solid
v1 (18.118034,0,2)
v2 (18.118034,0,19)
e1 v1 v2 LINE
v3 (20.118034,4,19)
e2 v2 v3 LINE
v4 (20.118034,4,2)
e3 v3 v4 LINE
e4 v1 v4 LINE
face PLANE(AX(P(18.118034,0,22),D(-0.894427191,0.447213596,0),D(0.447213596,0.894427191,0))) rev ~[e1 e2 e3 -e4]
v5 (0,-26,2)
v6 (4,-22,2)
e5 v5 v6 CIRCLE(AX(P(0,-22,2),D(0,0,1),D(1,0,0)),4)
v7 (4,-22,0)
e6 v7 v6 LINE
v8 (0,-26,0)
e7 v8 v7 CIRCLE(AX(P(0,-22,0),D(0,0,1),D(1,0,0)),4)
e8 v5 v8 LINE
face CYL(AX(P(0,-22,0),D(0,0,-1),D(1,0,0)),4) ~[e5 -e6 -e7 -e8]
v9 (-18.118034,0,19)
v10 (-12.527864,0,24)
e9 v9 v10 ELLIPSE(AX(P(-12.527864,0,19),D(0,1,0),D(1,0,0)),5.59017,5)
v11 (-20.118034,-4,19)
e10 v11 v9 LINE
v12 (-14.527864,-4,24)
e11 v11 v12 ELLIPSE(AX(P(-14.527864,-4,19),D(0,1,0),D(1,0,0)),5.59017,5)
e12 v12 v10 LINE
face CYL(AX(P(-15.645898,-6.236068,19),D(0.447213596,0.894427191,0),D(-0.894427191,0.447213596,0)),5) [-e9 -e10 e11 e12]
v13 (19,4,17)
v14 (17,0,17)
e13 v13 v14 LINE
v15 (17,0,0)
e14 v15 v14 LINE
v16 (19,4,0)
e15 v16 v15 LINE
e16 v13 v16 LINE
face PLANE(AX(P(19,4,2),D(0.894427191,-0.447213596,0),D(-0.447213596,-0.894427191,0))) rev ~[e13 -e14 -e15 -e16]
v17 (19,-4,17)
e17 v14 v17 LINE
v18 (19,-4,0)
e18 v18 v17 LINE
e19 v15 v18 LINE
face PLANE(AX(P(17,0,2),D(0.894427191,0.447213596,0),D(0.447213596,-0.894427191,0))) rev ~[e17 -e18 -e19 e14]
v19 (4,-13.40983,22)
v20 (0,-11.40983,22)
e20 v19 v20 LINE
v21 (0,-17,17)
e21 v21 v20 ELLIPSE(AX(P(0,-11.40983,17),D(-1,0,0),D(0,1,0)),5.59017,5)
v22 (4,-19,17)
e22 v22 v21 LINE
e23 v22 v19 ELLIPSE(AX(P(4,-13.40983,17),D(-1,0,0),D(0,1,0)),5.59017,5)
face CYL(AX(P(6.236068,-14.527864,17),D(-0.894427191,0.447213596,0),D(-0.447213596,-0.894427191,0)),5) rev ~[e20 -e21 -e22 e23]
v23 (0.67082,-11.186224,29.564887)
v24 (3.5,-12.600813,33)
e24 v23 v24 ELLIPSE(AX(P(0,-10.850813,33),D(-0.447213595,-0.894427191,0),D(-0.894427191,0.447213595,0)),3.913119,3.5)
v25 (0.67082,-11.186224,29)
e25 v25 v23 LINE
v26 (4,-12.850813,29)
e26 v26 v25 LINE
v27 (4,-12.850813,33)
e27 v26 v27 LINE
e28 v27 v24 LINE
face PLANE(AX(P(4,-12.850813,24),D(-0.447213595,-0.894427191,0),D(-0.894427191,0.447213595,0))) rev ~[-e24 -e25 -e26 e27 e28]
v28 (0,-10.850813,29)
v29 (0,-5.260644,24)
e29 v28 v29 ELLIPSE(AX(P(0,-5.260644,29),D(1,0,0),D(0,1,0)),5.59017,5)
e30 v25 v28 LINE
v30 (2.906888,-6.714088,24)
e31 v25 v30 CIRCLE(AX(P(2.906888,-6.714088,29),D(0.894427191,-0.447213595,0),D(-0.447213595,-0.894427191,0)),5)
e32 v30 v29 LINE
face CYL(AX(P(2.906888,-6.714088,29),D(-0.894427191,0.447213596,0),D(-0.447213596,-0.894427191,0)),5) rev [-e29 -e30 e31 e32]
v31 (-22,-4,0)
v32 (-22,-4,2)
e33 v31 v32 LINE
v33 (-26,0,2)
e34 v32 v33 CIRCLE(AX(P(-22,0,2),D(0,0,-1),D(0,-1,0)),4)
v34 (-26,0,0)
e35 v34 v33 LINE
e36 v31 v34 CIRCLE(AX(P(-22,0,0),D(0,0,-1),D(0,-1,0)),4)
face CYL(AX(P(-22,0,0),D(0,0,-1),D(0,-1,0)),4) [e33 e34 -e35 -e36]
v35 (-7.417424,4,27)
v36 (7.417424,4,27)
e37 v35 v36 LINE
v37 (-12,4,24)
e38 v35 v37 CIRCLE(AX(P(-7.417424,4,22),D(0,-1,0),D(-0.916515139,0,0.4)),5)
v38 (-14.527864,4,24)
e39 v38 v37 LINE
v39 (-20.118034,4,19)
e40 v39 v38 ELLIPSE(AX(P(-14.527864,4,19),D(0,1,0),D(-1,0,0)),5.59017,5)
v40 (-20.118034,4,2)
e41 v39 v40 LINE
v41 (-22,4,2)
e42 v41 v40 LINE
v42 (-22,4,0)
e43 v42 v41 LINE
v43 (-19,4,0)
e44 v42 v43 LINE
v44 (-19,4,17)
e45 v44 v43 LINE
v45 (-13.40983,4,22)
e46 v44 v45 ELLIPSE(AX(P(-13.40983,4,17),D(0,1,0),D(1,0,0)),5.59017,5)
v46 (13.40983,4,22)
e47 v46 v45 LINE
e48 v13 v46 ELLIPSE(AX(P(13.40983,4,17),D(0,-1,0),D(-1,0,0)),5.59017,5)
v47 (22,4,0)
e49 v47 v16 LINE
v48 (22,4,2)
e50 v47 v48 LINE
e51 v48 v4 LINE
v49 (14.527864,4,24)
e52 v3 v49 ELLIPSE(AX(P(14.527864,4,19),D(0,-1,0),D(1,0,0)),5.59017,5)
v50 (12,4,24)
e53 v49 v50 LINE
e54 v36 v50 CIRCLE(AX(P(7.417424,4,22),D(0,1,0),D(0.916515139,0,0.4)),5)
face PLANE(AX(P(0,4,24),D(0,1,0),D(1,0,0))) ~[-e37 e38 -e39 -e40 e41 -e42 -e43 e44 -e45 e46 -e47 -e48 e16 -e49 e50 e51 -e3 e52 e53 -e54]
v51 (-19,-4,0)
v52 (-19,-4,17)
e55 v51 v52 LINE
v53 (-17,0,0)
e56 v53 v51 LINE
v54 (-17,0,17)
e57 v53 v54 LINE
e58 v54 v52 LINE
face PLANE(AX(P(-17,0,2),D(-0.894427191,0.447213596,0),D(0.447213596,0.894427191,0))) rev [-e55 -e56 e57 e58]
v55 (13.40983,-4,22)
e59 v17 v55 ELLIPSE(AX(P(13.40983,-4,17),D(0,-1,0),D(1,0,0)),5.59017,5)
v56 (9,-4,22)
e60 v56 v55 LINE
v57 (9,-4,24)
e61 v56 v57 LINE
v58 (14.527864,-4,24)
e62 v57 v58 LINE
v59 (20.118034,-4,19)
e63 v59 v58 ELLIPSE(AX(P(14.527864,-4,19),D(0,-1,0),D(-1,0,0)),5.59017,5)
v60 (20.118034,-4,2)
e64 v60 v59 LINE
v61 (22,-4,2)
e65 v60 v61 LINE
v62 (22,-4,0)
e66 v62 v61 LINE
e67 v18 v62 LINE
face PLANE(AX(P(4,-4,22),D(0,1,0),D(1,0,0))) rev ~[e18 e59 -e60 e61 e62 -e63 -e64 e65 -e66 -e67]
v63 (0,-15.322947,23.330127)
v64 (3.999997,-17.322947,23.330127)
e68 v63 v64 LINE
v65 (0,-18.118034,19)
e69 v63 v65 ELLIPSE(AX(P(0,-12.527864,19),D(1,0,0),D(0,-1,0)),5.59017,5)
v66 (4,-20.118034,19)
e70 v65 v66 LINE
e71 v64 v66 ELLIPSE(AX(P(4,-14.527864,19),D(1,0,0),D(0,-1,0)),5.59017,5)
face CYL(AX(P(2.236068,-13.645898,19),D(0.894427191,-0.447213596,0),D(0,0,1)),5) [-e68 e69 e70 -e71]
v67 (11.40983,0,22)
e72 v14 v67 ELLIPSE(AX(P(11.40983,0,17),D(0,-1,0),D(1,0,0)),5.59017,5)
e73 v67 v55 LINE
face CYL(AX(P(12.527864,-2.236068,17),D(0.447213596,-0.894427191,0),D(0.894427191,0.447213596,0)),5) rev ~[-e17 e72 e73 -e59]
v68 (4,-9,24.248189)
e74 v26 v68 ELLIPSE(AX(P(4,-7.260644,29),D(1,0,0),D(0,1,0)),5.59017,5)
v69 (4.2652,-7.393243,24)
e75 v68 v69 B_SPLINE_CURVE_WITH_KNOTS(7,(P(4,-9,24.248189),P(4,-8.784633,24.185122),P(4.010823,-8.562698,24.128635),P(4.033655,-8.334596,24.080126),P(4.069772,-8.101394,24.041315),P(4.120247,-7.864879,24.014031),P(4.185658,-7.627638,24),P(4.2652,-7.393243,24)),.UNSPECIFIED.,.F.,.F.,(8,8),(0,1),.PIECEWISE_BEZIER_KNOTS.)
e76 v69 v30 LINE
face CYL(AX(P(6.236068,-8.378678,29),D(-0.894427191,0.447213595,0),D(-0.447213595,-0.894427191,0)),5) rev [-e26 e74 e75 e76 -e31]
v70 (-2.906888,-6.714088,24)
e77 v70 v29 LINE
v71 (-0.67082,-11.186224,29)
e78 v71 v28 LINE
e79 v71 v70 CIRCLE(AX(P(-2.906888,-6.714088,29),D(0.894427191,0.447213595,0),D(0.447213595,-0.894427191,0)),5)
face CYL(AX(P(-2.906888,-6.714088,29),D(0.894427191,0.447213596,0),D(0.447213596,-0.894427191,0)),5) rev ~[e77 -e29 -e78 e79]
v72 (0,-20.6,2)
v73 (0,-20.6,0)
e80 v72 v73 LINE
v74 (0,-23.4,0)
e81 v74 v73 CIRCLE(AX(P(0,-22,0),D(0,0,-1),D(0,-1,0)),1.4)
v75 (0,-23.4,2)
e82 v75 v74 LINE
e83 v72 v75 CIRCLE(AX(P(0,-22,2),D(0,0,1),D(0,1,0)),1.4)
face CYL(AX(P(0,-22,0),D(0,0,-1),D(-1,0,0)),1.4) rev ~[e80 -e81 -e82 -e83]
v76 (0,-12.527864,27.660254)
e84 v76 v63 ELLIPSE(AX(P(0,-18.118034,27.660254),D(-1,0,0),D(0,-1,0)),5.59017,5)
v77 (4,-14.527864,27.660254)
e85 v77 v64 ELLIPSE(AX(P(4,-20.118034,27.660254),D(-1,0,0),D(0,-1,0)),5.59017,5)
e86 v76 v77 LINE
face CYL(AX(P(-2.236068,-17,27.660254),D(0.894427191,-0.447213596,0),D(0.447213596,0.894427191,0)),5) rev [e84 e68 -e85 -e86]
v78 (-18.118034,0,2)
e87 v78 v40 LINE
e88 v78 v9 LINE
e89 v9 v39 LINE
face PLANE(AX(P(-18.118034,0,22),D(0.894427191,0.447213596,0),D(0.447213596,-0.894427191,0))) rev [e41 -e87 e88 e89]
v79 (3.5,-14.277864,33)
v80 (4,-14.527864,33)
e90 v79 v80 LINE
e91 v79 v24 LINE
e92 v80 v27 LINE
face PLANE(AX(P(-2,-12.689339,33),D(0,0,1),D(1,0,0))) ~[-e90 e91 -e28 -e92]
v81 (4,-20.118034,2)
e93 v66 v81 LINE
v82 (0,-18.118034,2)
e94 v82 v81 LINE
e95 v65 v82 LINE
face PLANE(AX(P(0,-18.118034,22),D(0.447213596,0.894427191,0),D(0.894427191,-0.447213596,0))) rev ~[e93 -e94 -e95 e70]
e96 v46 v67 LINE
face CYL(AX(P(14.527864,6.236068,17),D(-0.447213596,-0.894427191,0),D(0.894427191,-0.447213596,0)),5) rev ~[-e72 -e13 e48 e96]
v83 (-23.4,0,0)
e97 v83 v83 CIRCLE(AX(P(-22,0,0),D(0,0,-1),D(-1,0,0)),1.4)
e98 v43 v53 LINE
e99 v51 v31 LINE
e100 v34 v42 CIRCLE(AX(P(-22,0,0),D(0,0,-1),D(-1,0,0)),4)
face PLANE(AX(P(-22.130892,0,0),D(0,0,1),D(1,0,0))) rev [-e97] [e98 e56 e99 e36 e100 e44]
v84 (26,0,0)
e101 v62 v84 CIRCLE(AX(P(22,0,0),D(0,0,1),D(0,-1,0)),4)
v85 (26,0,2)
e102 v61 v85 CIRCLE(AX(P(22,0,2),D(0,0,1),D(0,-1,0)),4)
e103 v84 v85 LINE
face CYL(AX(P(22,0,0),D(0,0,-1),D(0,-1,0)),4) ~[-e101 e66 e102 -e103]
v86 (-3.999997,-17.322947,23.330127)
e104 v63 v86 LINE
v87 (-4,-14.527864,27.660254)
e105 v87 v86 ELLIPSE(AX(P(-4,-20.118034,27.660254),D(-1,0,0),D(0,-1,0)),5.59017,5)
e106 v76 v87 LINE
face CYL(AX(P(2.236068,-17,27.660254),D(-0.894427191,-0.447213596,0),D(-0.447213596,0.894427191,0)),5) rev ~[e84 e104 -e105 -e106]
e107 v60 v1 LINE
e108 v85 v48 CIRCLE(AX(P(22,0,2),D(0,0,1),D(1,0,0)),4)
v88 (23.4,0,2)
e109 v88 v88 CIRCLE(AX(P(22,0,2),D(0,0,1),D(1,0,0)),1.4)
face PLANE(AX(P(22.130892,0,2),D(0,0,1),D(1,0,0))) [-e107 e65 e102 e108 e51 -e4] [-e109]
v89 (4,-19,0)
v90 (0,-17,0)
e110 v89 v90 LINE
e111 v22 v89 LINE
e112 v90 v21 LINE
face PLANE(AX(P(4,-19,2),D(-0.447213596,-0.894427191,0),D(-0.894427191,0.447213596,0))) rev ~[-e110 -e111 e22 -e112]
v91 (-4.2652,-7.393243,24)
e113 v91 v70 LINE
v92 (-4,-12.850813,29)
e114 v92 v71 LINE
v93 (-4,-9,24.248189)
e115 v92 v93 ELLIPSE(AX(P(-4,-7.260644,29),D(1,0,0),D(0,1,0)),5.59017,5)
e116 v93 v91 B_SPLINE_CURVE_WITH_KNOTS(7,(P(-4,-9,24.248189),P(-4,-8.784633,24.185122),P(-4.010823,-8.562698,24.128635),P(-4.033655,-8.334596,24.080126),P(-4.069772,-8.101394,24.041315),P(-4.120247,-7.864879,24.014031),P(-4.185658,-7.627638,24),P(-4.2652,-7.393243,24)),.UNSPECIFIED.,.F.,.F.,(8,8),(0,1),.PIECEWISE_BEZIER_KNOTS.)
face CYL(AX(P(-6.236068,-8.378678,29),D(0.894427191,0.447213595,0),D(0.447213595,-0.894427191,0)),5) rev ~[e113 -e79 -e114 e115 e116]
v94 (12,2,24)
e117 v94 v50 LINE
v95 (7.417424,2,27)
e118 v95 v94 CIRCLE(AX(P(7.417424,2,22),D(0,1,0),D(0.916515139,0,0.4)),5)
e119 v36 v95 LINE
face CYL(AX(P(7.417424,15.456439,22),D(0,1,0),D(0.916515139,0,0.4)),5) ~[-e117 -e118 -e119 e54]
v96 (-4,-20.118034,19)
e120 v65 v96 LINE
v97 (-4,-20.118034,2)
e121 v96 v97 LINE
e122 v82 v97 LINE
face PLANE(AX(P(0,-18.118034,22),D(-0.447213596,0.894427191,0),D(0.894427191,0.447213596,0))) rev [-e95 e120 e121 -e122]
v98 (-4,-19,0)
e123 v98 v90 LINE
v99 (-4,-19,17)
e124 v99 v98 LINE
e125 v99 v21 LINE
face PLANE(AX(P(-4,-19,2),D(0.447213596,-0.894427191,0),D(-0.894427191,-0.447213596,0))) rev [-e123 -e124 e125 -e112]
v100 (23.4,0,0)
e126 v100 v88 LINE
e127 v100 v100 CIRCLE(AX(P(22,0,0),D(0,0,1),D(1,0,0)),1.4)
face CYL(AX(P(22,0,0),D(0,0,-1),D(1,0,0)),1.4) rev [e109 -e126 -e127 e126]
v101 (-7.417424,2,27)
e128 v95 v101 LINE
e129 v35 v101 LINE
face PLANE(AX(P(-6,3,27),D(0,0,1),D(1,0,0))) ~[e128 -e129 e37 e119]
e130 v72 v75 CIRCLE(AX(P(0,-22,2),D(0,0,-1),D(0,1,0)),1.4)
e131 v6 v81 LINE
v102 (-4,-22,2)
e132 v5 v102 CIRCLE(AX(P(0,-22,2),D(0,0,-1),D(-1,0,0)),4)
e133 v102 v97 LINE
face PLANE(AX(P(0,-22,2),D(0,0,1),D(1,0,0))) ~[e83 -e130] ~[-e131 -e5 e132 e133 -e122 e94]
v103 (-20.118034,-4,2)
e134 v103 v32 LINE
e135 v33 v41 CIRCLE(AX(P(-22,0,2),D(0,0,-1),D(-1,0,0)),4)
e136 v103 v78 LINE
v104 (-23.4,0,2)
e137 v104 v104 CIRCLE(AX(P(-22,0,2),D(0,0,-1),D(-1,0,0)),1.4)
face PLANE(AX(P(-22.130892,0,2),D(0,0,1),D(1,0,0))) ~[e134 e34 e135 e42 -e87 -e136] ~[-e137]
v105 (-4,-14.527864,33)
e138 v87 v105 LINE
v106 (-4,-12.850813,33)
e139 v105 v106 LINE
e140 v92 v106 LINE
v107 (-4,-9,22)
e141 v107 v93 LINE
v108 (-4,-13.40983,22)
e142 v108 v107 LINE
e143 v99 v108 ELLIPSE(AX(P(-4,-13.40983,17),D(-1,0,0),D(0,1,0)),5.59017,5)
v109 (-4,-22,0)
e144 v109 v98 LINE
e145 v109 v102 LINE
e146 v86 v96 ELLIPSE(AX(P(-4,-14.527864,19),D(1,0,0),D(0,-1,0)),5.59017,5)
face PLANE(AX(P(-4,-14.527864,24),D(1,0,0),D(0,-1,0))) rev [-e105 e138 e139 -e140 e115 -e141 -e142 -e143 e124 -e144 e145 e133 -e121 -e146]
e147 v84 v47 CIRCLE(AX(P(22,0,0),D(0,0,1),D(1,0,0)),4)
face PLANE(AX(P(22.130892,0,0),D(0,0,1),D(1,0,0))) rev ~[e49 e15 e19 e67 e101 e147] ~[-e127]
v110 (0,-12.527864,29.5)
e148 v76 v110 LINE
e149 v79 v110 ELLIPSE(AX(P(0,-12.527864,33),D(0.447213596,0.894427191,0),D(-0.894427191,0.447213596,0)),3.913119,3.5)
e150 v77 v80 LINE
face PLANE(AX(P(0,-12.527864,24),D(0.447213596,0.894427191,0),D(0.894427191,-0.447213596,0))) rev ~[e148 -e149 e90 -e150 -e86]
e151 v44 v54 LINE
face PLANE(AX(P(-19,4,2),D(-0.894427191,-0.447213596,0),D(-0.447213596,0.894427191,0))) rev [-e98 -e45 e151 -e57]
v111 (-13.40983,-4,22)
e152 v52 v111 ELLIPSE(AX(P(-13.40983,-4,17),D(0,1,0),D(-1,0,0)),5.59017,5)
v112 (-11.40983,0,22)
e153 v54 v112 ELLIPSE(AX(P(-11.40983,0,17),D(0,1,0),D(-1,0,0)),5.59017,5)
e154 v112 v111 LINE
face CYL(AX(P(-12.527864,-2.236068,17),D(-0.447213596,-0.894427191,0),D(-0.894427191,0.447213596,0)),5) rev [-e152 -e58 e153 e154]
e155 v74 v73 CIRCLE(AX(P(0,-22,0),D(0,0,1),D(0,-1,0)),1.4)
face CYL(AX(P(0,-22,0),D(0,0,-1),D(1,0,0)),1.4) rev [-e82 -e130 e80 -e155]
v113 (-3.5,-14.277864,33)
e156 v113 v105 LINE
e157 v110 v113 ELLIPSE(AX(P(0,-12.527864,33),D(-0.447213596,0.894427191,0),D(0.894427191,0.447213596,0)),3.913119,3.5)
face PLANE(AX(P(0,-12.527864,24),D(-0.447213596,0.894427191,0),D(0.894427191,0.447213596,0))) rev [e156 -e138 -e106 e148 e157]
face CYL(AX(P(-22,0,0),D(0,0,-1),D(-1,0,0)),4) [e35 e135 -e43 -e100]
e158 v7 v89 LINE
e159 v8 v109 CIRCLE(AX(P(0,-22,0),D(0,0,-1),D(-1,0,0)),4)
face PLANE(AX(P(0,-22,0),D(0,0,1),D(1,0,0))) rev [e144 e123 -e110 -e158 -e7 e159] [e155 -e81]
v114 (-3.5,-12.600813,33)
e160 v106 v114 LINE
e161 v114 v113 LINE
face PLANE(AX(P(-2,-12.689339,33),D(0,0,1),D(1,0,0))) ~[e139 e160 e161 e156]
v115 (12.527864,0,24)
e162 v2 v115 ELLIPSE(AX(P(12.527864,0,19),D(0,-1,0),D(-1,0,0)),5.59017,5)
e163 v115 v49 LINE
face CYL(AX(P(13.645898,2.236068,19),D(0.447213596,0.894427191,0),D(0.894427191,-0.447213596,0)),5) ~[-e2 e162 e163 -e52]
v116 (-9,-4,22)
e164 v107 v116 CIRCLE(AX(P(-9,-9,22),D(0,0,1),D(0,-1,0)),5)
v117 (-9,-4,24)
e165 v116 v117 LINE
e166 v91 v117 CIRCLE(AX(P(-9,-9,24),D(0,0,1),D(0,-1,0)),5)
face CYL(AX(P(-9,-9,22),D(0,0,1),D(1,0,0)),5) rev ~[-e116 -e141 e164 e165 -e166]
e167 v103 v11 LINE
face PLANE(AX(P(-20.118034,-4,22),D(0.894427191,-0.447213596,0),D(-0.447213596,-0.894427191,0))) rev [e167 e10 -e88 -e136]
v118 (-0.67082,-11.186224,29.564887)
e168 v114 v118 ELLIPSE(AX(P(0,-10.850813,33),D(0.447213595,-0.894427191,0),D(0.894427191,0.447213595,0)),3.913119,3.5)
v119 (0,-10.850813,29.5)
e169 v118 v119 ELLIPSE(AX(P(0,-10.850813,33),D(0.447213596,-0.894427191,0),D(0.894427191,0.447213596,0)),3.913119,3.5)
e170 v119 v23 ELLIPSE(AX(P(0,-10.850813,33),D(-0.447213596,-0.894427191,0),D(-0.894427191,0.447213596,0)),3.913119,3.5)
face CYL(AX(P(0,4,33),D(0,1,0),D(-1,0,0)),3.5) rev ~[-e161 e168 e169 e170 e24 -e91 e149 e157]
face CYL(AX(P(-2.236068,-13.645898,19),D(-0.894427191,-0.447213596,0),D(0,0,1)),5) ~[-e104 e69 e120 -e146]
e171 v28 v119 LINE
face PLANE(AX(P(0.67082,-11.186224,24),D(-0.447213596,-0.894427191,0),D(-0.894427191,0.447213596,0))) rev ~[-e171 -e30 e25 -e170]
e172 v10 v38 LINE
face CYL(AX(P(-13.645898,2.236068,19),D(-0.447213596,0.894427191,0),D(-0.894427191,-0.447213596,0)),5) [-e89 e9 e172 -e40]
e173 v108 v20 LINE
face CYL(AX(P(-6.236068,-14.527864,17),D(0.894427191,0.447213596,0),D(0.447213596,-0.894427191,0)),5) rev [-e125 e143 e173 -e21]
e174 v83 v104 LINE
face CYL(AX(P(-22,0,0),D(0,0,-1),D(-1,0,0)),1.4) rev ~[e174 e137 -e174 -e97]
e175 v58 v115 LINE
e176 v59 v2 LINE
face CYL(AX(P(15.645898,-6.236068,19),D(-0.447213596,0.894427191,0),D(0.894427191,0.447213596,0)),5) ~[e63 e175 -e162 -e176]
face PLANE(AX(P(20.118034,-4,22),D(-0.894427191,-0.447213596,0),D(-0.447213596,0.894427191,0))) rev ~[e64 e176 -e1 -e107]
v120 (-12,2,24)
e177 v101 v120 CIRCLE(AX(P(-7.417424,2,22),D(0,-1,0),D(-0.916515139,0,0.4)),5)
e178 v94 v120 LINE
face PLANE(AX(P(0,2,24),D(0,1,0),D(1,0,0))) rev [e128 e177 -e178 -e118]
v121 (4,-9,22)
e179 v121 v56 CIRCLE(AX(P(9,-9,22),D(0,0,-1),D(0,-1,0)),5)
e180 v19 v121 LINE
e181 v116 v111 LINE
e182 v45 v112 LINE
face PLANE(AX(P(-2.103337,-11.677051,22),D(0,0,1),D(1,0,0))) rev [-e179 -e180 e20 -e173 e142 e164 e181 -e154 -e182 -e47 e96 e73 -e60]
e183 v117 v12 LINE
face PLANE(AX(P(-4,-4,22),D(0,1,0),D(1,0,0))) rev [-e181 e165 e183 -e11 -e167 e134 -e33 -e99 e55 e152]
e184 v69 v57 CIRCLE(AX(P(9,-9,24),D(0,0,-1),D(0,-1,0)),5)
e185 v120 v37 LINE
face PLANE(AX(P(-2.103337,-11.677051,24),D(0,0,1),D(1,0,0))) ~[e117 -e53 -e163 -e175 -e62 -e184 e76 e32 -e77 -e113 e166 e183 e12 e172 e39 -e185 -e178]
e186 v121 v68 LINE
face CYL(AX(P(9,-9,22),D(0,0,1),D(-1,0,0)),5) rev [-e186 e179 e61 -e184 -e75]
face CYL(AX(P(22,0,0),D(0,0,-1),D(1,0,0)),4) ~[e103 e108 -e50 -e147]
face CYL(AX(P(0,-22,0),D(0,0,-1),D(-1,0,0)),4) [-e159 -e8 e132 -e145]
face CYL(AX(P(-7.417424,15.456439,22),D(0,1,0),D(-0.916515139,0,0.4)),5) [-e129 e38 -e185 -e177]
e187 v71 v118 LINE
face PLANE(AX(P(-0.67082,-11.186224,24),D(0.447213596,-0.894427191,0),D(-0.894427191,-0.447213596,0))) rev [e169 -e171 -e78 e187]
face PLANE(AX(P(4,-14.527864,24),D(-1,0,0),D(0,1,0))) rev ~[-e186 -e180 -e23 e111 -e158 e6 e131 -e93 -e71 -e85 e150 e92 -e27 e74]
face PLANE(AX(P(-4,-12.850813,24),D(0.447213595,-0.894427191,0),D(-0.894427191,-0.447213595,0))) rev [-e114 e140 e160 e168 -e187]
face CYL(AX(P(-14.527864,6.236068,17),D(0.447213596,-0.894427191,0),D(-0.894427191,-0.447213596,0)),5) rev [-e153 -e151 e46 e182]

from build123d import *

# Parameters (mm, degrees)
F0_R         = 1.4
F1_DEPTH     = 2
F3_DEPTH     = 20
F5_DEPTH     = 2
F6_W         = 24.2574699223
F6_H         = 65.0979466736
F7_DEPTH     = 25
F8_R         = 5
F10_DEPTH    = 9
F11_R        = 5
F12_W        = 12
F12_H        = 2
F13_DEPTH    = 3
F14_T1_DEPTH = 24.9128784748
F16_R        = 3.5
F17_DEPTH    = 25


# Not quite as in the source:
# - a fillet or chamfer that OpenCascade refuses, or shapes differently, is made with other operations: its cross-section is extruded or revolved along the edge and cut away or added


with BuildPart() as f1:
    # F0 (on Top) → F1 (new body)
    with BuildSketch(Plane.XY):
        with BuildLine():
            ThreePointArc((22, -4), (24.8284271247, -2.8284271247), (26, 0))
            ThreePointArc((26, 0), (24.8284271247, 2.8284271247), (22, 4))
            ThreePointArc((22, 4), (18, 0), (22, -4))
        make_face()
        with Locations((22, 0)):
            Circle(F0_R, mode=Mode.SUBTRACT)
        with BuildLine():
            ThreePointArc((22, -4), (18, 0), (22, 4))
            Line((22, 4), (19, 4))
            Line((19, 4), (17, 0))
            Line((17, 0), (19, -4))
            Line((19, -4), (22, -4))
        make_face()
    extrude(amount=F1_DEPTH)

    # F2 (on face) → F3 (join)
    with BuildSketch(Plane.XY.offset(2)):
        Polygon((19, 4), (17, 0), (19, -4), (20.1180339887, -4), (18.1180339887, 0), (20.1180339887, 4), align=None)
    extrude(amount=F3_DEPTH)



with BuildPart() as f1b:
    # F0 (on Top) → F1, piece 2 (new body)
    with BuildSketch(Plane.XY):
        with BuildLine():
            ThreePointArc((-4, -22), (0, -26), (4, -22))
            ThreePointArc((4, -22), (0, -18), (-4, -22))
        make_face()
        with Locations((0, -22)):
            Circle(F0_R, mode=Mode.SUBTRACT)
        with BuildLine():
            ThreePointArc((-4, -22), (0, -18), (4, -22))
            Line((4, -22), (4, -19))
            Line((4, -19), (0, -17))
            Line((0, -17), (-4, -19))
            Line((-4, -19), (-4, -22))
        make_face()
    extrude(amount=F1_DEPTH)

    # F2 (on face) → F3, piece 2 (join)
    with BuildSketch(Plane.XY.offset(2)):
        Polygon((4, -19), (0, -17), (-4, -19), (-4, -20.1180339887), (0, -18.1180339887), (4, -20.1180339887), align=None)
    extrude(amount=F3_DEPTH)


with BuildPart() as f1_1:
    add(f1.part)

    add(f1b.part)  # F5 merges F1b
    # F4 (on face) → F5 (join)
    with BuildSketch(Plane.XY.offset(22)):
        Polygon((4, -20.1180339887), (4, -4), (0, -4), (0, -18.1180339887), align=None)
        Polygon((17, 0), (19, 4), (0, 4), (0, -4), (4, -4), (19, -4), align=None)
        Polygon((18.1180339887, 0), (20.1180339887, 4), (19, 4), (17, 0), (19, -4), (20.1180339887, -4), align=None)
    extrude(amount=F5_DEPTH)

    # F6 (on face) → F7 (cut)
    with BuildSketch(Plane.XY.offset(24)):
        with Locations((-12.1287349612, -10.913932696)):
            Rectangle(F6_W, F6_H)
    extrude(amount=-F7_DEPTH, mode=Mode.SUBTRACT)

    # F8
    f8_edges = [f1_1.edges().sort_by_distance(p)[0] for p in [
        (4, -4, 23),
        (2, -18, 22),
        (18, -2, 22),
        (18, 2, 22),
        (19.118034, -2, 24),
        (19.118034, 2, 24),
        (2, -19.118034, 24),
    ]]
    fillet(f8_edges, radius=F8_R)

    # F9 (on face) → F10 (join)
    with BuildSketch(Plane.XY.offset(24)):
        Polygon((0, -10.8508134726), (0, -12.527864045), (4, -14.527864045), (4, -12.8508134726), (0.6708202289, -11.1862235871), align=None)
    extrude(amount=F10_DEPTH)

    # F11
    f11_edges = [f1_1.edges().sort_by_distance(p)[0] for p in [
        (2, -11.850813, 24),
        (2, -13.527864, 24),
    ]]
    fillet(f11_edges, radius=F11_R)

    # F12 (on face) → F13 (join)
    with BuildSketch(Plane.XY.offset(24)):
        with Locations((6, 3)):
            Rectangle(F12_W, F12_H)
    extrude(amount=F13_DEPTH)

    # F14: fillet of radius 5 on 1 edges, made by hand

    # F14_s2 → F14_t1 (cut)
    with BuildSketch(Plane.XZ.offset(-15.4564392374)):
        with BuildLine():
            ThreePointArc((12, 24), (10.1560370926, 26.1833001327), (7.417424305, 27))
            Line((7.417424305, 27), (12, 27))
            Line((12, 27), (12, 24))
        make_face()
    extrude(amount=F14_T1_DEPTH, mode=Mode.SUBTRACT)

    # F15: F1 across face


with BuildPart() as f1_2:
    add(f1_1.part)
    add(f1_1.part.mirror(Plane(origin=(0, -10.4635359507, 20.0753373273), x_dir=(0, -1, 0), z_dir=(-1, 0, 0))))

    # F16 (on face) → F17 (cut)
    with BuildSketch(Plane(origin=(0, 4, 0), x_dir=(-1, 0, 0), z_dir=(0, 1, 0))):
        with Locations((0, 33)):
            Circle(F16_R)
    extrude(amount=-F17_DEPTH, mode=Mode.SUBTRACT)


solid = f1_2.part
